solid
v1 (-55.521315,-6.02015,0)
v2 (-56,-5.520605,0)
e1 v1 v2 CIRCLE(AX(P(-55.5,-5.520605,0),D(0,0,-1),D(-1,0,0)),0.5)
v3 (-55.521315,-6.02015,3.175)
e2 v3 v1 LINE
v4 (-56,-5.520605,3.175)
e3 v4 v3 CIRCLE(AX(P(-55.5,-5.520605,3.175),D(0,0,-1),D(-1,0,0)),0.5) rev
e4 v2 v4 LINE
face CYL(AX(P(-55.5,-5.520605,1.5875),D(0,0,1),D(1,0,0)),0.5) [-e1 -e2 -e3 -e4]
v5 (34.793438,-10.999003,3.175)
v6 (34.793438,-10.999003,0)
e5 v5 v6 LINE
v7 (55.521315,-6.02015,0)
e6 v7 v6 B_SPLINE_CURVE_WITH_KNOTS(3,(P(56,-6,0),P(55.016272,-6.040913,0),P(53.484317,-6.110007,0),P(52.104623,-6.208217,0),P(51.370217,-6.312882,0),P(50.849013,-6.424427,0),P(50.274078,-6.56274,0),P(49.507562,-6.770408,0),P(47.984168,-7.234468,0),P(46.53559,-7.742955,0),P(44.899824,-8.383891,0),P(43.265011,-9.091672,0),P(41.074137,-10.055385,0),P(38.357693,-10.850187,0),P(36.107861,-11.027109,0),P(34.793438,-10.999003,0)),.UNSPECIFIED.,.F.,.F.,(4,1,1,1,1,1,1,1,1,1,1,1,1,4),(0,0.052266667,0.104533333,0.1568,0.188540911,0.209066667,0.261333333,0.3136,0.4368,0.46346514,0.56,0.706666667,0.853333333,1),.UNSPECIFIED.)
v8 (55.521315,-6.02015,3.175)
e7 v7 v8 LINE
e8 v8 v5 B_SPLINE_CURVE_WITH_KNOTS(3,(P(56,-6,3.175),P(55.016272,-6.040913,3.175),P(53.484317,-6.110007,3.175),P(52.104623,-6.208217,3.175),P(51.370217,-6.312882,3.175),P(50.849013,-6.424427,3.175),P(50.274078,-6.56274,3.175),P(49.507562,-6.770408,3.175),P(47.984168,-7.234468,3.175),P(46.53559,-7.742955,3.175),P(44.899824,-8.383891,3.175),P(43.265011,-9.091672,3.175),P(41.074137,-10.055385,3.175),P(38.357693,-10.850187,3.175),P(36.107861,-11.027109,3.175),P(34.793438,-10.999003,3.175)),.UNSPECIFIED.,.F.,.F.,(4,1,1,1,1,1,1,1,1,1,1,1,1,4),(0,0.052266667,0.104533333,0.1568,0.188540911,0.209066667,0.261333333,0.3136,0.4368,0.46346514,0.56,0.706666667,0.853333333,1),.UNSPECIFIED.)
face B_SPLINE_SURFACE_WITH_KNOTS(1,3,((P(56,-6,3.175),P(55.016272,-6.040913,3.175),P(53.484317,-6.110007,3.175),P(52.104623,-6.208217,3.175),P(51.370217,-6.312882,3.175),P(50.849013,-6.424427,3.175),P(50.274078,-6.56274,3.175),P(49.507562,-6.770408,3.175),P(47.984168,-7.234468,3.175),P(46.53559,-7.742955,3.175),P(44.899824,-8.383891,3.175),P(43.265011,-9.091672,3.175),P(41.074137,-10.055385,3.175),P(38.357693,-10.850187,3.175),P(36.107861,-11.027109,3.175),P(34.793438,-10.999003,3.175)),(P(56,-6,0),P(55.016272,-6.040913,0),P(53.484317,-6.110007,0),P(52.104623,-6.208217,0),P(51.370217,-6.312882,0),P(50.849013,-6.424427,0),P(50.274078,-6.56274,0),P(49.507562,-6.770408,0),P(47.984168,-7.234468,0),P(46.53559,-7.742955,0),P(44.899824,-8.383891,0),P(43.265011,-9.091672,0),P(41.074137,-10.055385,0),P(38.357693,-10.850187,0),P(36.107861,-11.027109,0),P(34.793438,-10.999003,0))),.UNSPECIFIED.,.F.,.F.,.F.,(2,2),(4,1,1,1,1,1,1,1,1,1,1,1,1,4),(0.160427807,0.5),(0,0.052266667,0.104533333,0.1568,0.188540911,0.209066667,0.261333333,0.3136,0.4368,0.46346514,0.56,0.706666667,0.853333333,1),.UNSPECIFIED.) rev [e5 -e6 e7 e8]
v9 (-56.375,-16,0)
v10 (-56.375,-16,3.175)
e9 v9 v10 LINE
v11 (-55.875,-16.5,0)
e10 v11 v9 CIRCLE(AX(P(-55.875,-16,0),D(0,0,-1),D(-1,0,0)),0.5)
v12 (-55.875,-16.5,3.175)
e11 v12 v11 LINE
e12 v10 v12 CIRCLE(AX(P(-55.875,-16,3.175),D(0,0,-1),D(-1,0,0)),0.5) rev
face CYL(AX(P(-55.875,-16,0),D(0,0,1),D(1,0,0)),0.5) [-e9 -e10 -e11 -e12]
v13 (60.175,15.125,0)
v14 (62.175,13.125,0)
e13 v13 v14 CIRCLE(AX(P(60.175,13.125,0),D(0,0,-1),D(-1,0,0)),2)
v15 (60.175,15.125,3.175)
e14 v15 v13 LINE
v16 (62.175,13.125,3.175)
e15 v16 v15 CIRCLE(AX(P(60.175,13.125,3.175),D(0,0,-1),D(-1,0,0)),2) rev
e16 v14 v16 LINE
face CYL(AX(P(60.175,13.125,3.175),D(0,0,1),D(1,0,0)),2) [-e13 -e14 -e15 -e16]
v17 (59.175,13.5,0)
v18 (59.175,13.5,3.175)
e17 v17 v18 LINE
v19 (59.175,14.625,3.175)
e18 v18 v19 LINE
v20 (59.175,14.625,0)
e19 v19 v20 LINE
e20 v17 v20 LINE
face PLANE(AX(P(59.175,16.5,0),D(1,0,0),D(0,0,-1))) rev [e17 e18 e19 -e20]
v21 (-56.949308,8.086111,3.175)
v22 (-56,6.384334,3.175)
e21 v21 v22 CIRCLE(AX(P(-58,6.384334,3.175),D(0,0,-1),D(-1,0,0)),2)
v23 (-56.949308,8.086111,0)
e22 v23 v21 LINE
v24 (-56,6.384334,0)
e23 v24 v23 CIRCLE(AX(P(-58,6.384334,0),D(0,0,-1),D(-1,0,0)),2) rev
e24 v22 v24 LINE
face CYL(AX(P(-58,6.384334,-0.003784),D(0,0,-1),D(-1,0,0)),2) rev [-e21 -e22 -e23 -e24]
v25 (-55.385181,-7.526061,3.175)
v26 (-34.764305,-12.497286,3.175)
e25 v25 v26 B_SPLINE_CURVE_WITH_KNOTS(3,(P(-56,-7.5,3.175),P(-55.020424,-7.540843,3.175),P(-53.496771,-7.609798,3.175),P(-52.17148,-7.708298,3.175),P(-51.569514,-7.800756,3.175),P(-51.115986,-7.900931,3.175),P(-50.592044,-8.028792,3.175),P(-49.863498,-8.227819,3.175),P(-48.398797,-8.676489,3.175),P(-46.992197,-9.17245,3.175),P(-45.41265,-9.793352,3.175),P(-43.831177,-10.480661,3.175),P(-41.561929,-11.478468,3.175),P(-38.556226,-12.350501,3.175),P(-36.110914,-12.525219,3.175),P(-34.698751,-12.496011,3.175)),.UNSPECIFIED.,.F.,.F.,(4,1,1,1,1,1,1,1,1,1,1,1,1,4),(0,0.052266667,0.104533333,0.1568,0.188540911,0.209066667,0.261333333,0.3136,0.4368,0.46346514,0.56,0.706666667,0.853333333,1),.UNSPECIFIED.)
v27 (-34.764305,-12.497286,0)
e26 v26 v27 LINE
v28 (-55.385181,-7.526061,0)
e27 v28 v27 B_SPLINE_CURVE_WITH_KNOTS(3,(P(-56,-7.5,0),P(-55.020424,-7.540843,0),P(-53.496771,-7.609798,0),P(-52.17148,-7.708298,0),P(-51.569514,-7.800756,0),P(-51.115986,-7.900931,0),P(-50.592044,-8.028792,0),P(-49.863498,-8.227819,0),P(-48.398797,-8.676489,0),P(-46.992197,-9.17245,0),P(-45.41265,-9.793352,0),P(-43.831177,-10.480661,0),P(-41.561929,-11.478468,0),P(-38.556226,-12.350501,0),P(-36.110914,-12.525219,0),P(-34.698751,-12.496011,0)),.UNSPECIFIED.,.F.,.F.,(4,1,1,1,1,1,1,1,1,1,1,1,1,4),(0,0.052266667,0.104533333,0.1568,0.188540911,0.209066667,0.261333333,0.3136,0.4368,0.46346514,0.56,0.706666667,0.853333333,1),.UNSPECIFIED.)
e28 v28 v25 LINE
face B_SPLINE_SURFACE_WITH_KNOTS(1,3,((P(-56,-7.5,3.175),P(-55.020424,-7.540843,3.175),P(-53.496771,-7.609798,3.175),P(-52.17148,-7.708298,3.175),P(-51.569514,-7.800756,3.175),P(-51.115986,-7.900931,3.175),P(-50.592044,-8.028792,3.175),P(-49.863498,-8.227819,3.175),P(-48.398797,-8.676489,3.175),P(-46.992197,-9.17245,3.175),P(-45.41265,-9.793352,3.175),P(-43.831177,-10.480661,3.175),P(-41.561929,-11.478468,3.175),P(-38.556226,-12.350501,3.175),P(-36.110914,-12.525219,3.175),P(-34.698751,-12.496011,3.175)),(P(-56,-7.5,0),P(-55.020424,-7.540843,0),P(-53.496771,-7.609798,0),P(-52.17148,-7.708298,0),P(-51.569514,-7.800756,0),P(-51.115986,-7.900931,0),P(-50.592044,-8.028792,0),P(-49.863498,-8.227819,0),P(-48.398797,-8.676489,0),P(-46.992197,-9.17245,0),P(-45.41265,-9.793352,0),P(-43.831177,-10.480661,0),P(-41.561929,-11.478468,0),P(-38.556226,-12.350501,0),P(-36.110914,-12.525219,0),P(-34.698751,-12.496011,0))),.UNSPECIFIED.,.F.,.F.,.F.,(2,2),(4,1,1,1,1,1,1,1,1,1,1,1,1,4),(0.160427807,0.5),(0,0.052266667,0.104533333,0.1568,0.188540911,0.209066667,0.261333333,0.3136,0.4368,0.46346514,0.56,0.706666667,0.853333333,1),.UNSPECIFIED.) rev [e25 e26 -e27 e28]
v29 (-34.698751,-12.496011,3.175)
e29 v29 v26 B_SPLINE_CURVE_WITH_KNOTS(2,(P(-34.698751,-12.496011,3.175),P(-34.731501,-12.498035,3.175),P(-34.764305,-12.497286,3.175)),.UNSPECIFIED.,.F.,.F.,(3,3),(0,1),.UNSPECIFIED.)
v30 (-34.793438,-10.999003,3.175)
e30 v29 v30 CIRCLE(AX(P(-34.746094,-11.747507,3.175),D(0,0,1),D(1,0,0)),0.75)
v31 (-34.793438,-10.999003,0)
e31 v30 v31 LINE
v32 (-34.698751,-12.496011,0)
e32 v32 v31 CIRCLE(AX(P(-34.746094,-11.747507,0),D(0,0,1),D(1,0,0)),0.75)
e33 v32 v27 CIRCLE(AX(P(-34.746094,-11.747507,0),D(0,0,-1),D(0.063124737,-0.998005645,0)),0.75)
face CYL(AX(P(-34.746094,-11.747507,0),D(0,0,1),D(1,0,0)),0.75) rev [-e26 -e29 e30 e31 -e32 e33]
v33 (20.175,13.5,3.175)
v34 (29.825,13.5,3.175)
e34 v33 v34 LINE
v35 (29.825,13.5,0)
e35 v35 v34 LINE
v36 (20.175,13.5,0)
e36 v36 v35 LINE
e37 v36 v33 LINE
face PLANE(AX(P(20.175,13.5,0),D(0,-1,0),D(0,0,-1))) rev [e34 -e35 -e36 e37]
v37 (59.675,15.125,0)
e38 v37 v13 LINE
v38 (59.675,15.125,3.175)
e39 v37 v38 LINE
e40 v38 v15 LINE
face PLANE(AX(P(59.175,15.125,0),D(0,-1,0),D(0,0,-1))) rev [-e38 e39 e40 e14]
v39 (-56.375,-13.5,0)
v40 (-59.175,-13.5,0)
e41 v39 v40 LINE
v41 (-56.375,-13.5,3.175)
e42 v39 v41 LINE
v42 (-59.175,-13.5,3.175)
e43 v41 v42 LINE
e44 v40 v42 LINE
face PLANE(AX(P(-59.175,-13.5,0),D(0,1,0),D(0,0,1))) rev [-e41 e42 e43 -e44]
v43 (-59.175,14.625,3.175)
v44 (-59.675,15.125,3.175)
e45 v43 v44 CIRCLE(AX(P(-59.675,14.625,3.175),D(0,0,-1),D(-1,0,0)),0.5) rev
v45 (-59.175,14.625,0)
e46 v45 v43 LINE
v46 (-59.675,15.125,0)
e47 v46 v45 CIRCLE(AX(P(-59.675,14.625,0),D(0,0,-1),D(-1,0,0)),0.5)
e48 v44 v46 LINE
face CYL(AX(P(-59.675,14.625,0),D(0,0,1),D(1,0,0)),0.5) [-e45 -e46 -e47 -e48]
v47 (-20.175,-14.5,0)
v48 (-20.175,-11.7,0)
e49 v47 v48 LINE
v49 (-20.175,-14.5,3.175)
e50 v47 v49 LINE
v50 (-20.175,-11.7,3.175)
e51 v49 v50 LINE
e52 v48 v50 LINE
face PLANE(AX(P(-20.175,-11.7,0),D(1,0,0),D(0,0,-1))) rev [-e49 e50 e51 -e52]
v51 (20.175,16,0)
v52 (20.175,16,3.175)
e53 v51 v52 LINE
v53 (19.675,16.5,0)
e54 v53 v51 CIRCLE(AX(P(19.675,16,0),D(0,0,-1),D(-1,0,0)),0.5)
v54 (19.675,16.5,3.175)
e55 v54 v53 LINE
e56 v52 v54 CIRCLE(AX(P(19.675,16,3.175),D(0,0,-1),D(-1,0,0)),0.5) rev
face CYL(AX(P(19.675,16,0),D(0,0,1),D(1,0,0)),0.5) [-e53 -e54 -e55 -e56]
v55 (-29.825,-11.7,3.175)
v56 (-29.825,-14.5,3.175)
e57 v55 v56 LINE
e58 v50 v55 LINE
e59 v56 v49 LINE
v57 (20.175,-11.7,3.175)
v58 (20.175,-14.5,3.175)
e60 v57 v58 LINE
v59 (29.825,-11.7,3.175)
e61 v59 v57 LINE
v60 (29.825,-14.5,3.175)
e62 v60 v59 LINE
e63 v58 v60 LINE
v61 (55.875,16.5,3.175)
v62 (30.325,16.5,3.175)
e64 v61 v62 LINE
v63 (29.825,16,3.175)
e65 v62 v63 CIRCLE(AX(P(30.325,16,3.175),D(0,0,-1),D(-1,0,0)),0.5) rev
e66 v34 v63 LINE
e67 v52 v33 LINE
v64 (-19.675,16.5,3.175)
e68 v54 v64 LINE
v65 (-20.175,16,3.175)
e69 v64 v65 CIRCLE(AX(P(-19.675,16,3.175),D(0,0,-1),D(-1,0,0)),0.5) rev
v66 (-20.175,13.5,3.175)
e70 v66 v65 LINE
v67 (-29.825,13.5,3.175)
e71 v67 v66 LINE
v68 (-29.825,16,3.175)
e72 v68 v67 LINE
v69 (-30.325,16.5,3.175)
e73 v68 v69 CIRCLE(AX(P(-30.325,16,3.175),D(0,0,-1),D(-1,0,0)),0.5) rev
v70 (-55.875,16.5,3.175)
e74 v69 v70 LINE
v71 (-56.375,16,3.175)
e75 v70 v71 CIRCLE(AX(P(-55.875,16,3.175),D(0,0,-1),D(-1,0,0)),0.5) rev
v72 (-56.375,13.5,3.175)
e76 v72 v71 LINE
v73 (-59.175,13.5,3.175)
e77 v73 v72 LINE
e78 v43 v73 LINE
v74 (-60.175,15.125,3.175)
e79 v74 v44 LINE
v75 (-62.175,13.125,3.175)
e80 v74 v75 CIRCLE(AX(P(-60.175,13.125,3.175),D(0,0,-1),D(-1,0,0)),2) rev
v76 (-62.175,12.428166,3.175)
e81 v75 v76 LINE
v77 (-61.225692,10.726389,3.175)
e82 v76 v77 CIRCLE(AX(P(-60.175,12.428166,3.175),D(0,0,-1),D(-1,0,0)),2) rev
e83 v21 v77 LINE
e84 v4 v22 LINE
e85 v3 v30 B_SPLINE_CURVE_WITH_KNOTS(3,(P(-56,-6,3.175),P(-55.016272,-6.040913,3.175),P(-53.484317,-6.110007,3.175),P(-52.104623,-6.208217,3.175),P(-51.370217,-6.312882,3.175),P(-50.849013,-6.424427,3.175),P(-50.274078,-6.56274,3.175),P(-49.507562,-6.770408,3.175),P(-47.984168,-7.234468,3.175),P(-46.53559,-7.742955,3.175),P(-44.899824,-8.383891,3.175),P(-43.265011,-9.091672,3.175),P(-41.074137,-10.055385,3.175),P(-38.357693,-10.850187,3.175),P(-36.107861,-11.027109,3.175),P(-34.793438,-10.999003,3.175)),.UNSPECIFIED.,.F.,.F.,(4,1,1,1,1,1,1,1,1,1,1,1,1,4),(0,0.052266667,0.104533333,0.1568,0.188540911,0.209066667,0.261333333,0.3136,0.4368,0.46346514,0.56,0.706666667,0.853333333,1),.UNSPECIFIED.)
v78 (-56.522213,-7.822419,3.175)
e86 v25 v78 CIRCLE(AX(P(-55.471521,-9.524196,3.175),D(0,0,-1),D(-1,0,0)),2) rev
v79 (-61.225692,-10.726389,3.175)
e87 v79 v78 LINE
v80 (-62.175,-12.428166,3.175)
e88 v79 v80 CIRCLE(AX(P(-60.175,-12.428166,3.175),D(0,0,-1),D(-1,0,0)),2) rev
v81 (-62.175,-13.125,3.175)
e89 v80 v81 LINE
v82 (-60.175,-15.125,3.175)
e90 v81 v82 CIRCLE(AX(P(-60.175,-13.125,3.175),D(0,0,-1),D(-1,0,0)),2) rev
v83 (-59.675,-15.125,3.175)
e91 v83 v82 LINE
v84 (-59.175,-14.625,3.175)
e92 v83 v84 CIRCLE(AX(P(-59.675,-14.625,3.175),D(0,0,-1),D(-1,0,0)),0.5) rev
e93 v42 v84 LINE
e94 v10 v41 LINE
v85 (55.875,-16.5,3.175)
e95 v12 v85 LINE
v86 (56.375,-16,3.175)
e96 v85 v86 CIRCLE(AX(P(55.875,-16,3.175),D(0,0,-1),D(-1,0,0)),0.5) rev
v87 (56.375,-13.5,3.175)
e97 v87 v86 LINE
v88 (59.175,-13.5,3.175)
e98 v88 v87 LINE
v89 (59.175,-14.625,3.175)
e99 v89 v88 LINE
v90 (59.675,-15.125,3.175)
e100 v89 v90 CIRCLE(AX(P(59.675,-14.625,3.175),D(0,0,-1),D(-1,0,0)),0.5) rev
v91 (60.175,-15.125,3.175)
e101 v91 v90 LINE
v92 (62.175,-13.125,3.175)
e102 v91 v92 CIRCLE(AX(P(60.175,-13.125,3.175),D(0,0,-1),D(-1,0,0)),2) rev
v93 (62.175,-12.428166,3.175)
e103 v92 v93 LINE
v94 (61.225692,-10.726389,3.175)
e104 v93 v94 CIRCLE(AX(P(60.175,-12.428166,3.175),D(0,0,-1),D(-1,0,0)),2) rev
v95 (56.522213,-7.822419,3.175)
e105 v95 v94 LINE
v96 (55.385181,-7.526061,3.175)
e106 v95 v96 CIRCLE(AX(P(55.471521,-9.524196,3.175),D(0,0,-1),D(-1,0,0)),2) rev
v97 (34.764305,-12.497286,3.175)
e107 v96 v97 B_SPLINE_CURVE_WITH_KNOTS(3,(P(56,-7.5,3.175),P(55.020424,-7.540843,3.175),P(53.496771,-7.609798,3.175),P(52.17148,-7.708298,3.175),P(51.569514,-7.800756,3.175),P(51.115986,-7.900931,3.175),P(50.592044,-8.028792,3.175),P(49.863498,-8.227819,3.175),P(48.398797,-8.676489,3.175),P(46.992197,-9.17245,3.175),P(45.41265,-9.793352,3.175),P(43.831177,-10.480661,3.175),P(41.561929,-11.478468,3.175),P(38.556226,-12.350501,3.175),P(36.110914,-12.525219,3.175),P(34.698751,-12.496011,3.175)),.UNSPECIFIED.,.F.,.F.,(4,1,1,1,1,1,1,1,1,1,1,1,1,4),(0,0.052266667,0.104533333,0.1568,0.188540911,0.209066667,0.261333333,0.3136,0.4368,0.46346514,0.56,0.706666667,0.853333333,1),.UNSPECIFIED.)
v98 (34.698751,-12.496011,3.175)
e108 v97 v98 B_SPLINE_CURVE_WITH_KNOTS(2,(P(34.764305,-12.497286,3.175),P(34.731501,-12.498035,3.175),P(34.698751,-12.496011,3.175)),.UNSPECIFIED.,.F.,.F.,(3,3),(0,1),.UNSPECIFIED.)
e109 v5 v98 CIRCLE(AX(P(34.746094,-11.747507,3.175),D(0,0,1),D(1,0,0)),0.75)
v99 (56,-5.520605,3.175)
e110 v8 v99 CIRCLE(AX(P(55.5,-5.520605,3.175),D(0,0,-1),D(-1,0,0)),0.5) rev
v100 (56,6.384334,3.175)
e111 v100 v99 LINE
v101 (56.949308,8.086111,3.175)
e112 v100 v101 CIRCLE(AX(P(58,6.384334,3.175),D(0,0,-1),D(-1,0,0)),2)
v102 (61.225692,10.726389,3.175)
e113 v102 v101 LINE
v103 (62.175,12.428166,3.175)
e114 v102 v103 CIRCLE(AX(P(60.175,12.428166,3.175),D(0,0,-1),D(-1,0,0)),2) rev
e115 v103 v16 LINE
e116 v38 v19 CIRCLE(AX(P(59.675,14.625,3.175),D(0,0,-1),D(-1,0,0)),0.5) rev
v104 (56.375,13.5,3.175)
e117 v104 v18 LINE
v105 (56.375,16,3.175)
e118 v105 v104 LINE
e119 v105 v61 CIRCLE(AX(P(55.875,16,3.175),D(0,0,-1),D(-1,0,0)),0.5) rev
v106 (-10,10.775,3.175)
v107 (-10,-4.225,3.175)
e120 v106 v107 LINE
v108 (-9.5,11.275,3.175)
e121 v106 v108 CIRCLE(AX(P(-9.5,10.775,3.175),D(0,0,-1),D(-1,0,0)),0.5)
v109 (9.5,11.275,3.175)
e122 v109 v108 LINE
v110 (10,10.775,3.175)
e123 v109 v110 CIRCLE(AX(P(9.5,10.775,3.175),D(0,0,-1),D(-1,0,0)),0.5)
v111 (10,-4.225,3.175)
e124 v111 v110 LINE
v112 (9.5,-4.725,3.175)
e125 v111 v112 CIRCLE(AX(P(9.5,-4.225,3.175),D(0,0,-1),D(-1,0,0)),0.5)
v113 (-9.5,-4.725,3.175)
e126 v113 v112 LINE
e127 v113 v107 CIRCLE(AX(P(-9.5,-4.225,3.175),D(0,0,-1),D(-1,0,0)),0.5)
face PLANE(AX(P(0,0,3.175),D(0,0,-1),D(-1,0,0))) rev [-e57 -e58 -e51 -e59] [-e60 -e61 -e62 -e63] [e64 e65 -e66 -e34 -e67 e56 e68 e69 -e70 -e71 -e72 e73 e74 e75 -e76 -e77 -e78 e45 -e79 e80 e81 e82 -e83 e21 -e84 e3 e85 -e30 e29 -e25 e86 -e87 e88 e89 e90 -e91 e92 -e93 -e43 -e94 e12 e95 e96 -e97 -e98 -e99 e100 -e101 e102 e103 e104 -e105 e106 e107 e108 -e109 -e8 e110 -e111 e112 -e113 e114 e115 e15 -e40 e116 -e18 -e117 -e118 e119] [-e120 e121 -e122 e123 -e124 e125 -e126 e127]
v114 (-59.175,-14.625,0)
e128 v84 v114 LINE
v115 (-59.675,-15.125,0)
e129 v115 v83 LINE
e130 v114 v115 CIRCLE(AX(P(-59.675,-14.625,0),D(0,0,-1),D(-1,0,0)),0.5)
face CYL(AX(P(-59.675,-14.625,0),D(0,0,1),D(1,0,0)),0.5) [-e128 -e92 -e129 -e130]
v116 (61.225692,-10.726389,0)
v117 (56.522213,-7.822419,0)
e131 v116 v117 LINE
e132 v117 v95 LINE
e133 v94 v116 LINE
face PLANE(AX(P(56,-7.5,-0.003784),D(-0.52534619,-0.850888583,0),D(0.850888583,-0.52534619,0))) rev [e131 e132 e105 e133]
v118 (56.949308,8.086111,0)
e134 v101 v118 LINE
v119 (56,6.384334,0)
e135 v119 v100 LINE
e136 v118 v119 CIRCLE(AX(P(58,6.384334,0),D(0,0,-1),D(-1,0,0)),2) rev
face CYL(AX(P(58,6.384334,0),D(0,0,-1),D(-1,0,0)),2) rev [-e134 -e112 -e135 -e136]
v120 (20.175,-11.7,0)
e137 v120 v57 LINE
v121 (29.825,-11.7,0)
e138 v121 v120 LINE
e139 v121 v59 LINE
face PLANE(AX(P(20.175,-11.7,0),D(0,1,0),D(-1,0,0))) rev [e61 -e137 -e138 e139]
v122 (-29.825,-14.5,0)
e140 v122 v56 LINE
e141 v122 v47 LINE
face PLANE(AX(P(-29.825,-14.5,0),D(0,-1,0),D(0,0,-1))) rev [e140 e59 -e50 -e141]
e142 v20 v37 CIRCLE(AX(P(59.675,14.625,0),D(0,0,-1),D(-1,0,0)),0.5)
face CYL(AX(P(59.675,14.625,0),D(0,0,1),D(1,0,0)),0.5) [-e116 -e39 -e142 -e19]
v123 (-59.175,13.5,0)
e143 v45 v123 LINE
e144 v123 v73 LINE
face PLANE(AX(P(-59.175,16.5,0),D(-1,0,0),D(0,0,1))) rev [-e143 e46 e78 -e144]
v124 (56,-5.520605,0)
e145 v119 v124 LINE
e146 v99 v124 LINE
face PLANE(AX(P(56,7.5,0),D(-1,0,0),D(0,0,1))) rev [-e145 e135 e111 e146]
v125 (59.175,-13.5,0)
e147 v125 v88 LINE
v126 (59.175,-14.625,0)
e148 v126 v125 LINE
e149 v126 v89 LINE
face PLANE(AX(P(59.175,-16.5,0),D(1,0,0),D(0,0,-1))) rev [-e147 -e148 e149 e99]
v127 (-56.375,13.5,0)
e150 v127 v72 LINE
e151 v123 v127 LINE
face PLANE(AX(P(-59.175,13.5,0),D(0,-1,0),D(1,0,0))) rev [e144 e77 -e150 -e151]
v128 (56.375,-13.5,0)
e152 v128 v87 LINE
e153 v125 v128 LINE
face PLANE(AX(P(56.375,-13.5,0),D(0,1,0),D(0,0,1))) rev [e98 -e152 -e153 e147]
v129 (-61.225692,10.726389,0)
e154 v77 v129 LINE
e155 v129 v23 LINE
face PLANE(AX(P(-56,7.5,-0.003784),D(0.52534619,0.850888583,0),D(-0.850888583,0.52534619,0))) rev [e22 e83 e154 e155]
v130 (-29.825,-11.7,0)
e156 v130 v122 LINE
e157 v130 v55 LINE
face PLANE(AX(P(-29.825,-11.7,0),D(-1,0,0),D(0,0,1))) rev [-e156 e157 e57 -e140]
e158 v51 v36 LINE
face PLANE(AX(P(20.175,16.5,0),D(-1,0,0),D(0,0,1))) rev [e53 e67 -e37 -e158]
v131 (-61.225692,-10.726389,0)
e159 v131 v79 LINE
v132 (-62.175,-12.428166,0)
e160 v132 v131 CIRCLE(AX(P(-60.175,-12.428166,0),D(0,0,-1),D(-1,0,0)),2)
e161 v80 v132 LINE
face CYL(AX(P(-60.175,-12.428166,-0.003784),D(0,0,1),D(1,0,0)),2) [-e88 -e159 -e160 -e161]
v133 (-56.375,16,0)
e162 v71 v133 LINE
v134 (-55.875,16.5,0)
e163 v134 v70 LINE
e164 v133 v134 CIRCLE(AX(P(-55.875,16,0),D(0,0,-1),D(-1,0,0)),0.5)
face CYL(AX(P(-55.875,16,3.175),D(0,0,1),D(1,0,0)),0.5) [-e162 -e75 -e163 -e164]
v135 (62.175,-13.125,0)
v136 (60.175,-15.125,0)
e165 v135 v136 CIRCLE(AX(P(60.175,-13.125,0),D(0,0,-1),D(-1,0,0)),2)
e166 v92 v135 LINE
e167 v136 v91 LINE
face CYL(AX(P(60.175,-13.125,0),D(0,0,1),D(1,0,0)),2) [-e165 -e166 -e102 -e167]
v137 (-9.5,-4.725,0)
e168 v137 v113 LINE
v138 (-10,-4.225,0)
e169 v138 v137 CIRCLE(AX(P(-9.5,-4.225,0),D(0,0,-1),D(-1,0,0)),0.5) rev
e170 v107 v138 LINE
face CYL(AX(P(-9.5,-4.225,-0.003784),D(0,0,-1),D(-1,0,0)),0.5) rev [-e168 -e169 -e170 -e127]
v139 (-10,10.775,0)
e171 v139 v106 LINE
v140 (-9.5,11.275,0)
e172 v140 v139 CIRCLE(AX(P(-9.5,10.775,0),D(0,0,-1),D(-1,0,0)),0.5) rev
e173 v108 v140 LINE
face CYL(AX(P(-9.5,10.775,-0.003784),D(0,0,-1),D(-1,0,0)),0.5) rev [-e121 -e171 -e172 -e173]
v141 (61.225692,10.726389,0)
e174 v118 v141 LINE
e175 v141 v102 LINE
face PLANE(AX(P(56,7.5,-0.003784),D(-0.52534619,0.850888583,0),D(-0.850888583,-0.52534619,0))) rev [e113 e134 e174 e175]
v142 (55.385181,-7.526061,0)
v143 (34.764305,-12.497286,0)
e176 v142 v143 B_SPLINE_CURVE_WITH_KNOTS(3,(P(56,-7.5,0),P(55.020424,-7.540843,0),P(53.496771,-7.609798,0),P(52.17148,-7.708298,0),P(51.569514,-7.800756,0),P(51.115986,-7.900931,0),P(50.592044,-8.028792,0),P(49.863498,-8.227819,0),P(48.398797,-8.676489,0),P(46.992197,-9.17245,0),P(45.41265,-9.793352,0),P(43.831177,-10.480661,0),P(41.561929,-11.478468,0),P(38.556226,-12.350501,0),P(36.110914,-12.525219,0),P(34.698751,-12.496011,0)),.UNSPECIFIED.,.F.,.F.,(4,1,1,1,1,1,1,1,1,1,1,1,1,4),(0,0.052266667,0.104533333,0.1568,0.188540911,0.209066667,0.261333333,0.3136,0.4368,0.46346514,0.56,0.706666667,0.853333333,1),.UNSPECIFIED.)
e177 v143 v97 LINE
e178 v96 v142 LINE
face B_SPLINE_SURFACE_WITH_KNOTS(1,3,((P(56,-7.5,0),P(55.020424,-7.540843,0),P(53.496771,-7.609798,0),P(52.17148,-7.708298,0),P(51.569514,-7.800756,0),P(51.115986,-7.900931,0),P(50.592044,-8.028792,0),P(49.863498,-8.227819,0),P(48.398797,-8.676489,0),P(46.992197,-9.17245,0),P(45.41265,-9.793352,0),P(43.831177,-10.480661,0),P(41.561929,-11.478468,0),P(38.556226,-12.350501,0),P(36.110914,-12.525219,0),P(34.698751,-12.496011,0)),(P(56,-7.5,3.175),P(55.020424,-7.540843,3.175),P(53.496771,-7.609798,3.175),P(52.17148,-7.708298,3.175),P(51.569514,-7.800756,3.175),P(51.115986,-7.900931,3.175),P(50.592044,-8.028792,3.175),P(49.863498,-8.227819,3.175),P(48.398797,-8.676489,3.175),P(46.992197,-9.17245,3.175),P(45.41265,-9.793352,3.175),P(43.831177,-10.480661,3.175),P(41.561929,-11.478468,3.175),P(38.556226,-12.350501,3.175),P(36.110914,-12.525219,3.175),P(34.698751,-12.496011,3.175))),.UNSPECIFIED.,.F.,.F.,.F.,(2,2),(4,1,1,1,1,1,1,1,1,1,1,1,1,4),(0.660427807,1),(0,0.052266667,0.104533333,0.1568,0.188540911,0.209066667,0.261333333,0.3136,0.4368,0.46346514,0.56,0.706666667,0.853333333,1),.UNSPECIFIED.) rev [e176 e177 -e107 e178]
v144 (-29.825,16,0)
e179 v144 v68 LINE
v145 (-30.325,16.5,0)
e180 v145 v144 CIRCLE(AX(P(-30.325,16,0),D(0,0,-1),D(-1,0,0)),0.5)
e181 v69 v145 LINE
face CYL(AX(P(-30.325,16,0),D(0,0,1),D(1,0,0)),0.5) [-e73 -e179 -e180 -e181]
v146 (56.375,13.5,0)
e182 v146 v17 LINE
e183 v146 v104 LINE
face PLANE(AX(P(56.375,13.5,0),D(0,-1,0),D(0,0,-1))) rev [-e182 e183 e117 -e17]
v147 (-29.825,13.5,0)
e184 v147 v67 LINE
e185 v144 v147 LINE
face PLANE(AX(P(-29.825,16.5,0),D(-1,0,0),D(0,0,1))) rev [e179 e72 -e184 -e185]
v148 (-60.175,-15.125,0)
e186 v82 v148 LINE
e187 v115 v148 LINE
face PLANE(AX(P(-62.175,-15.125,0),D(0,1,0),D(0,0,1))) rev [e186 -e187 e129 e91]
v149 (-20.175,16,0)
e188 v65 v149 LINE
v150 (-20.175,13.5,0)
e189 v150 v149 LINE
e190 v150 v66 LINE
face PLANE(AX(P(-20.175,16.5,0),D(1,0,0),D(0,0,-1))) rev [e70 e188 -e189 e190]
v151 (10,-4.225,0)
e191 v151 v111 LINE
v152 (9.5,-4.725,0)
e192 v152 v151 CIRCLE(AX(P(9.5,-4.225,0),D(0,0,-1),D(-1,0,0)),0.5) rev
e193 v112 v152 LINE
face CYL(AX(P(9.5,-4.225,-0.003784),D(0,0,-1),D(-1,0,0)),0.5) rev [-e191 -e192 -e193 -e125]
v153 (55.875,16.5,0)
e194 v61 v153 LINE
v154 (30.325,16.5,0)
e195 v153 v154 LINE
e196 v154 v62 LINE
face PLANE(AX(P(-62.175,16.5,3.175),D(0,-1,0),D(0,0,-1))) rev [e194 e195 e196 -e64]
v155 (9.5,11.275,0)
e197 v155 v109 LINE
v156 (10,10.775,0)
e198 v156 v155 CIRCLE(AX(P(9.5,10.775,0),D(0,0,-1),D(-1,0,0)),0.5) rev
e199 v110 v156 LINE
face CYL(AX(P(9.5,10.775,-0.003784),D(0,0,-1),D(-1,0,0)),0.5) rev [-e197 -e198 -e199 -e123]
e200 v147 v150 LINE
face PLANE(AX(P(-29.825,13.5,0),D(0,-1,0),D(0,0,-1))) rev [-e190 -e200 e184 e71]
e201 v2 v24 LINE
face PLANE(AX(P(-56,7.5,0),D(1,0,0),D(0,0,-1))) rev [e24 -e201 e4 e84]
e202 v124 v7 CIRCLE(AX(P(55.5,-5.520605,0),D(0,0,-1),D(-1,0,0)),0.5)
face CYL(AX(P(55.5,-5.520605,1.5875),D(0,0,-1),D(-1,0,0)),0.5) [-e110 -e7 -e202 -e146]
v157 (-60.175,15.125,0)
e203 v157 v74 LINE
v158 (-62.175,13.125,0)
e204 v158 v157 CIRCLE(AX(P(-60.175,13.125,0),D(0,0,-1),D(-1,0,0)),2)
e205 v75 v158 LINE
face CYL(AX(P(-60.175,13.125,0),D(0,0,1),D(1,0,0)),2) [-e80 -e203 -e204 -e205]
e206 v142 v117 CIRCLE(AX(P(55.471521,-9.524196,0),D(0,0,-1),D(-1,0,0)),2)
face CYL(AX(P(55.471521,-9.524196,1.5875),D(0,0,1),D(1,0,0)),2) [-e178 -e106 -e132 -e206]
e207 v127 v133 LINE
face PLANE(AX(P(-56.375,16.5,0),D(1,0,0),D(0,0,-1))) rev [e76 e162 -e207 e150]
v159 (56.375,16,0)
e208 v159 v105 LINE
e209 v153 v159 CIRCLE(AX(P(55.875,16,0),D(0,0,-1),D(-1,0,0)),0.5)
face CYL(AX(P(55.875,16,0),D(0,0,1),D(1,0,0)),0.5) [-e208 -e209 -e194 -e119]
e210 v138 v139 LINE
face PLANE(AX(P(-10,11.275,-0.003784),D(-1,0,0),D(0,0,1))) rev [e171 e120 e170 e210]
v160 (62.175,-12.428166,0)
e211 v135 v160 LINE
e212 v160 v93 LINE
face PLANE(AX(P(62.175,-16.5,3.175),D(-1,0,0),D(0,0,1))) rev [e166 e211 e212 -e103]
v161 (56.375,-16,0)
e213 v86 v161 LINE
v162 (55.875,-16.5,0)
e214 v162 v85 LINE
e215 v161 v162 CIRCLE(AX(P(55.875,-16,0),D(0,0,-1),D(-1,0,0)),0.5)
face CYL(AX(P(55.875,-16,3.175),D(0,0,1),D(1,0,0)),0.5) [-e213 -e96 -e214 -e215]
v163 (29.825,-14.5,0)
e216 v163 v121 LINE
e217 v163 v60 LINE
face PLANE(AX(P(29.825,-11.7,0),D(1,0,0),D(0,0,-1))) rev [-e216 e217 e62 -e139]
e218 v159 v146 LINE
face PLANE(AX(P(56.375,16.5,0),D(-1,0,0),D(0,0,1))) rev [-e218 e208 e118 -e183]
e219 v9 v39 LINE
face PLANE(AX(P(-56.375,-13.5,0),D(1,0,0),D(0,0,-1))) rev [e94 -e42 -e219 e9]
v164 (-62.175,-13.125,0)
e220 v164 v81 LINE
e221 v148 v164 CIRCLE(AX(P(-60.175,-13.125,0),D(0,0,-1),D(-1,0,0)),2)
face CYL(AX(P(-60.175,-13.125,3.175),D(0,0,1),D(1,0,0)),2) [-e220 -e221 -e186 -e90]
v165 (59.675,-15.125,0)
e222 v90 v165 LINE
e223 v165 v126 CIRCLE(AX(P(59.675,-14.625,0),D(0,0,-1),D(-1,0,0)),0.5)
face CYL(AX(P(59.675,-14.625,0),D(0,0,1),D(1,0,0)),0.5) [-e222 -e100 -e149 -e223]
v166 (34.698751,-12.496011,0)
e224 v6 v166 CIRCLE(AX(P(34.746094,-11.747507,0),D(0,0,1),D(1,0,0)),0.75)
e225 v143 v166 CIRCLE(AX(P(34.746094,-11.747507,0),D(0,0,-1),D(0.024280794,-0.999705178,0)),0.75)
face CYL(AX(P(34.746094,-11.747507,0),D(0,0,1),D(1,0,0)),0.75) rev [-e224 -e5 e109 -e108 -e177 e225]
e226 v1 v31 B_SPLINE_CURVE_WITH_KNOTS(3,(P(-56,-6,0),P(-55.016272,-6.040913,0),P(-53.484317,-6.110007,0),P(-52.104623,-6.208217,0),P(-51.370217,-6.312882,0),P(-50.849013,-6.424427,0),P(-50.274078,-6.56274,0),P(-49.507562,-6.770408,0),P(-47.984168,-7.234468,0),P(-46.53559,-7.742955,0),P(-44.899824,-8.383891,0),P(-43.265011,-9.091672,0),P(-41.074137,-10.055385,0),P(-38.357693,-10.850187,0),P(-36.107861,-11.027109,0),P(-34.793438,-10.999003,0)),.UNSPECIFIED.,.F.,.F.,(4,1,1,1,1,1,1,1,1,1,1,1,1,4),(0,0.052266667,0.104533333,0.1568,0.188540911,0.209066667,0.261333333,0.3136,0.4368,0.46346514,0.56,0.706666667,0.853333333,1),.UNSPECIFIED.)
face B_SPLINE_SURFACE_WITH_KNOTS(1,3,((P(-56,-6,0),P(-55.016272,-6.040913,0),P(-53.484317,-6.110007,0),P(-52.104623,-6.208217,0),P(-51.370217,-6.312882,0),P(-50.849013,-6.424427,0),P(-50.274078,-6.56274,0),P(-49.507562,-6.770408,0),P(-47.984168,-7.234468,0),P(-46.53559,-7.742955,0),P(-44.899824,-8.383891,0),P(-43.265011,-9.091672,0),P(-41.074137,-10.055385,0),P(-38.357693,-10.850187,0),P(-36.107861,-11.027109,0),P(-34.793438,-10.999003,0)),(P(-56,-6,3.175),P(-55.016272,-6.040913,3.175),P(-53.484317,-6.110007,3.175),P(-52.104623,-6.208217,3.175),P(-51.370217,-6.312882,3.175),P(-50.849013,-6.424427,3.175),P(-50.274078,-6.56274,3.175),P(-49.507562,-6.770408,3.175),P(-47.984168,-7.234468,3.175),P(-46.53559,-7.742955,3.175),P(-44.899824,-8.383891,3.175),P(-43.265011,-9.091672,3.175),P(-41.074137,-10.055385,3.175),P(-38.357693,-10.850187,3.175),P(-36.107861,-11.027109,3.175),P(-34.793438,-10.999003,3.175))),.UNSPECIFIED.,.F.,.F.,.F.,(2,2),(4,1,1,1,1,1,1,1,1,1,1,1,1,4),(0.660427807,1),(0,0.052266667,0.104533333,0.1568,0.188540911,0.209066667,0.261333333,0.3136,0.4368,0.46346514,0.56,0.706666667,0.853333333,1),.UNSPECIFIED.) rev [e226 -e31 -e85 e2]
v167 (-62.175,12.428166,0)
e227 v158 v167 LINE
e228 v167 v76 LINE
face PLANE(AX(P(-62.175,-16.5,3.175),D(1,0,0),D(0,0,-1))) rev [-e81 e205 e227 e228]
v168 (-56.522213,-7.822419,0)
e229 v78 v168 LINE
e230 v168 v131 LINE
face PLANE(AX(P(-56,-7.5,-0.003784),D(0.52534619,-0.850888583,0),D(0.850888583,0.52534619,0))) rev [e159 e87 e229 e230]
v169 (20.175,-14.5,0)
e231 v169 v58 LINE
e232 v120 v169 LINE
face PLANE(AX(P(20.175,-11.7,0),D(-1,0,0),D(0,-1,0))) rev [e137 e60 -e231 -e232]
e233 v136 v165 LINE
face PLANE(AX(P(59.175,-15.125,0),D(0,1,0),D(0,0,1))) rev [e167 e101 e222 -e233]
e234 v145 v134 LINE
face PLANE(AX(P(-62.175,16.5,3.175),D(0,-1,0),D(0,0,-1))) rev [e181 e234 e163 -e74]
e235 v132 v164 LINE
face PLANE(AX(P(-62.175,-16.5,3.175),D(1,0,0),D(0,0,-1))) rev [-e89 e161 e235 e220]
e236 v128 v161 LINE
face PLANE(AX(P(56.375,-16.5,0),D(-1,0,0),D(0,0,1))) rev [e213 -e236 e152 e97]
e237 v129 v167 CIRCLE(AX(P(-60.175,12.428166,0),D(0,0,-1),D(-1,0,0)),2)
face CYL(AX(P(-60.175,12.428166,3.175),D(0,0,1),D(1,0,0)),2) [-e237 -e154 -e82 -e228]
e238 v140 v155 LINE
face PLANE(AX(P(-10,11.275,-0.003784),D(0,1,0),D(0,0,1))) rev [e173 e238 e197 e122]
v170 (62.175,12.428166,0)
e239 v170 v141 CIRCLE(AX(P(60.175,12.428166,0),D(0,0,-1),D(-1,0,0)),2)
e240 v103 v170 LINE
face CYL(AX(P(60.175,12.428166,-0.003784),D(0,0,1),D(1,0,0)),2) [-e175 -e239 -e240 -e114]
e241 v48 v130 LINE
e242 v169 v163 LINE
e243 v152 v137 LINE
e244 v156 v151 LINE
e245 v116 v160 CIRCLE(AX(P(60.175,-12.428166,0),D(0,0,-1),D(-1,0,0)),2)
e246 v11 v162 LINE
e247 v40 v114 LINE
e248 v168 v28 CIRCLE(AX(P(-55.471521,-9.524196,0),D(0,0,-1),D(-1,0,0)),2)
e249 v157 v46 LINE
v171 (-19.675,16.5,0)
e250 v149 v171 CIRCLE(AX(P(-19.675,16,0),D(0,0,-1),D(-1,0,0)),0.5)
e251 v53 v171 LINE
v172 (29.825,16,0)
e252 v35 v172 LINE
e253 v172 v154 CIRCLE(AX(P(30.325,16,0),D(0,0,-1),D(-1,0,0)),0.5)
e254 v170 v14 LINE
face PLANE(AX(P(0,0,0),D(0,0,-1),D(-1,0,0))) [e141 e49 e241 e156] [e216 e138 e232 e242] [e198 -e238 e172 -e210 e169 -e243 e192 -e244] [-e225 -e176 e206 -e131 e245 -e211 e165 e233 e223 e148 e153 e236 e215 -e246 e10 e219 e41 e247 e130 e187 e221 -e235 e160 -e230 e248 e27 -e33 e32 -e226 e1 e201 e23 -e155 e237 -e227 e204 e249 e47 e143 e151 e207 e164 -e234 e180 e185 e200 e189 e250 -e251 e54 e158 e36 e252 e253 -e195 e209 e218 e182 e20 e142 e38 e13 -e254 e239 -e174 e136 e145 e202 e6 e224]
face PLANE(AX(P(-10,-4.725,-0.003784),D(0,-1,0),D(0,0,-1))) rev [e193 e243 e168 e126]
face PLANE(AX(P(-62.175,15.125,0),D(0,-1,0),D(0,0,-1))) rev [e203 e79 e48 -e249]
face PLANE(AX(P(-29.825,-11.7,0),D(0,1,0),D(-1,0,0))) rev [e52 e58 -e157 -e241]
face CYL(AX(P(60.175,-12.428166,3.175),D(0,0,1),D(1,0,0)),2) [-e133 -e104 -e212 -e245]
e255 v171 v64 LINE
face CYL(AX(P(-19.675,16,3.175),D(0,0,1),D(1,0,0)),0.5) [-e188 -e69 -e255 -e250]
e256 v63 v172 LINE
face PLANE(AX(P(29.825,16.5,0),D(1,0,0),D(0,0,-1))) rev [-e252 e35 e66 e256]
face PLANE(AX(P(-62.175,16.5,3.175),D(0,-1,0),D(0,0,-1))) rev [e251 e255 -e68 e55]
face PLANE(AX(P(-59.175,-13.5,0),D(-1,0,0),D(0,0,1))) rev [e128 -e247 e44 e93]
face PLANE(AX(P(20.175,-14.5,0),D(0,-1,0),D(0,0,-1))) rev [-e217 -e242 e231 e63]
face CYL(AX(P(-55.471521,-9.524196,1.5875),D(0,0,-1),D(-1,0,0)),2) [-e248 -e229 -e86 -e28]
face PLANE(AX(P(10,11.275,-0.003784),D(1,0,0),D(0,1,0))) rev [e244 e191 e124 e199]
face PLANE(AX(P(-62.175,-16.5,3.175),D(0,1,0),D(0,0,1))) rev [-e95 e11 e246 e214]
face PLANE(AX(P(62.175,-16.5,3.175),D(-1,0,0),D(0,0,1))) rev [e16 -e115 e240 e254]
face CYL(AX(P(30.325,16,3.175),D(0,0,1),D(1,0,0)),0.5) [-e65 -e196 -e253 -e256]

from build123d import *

# Parameters (mm, degrees)
SKETCH1_W           = 124.35
SKETCH1_H           = 33
BOSS_EXTRUDE1_DEPTH = 3.175
SKETCH2_W           = 9.65
SKETCH2_H           = 2.8
SKETCH2_H_2         = 3
CUT_EXTRUDE1_DEPTH  = 65.405444257
SKETCH4_W           = 2.8
SKETCH4_H           = 3
SKETCH4_W_2         = 6.175
SKETCH4_H_2         = 15
CUT_EXTRUDE2_DEPTH  = 65.405444257
SKETCH6_W           = 3
SKETCH6_H           = 1.375
CUT_EXTRUDE3_DEPTH  = 65.405444257
CUT_SWEEP1_DEPTH    = 3.175
SKETCH12_R          = 0.75
CUT_EXTRUDE6_DEPTH  = 65.405444385
CUT_EXTRUDE7_DEPTH  = 65.405444385
FILLET6_R           = 2
FILLET7_R           = 0.5
SKETCH14_W          = 20
SKETCH14_H          = 16
CUT_EXTRUDE8_DEPTH  = 65.405444385
FILLET8_R           = 0.5


# Read off the part's stored shape, not the designer's step: Cut-Sweep1
with BuildPart() as part:
    # Sketch1 → Boss-Extrude1 (new body)
    with BuildSketch(Plane.XY):
        Rectangle(SKETCH1_W, SKETCH1_H)
    extrude(amount=BOSS_EXTRUDE1_DEPTH)

    # Sketch2 → Cut-Extrude1 (cut, through all)
    with BuildSketch(Plane.XY.offset(3.175)):
        with Locations((-25, -13.1)):
            Rectangle(SKETCH2_W, SKETCH2_H)
        with Locations((25, -13.1)):
            Rectangle(SKETCH2_W, SKETCH2_H)
        with Locations((-25, 15)):
            Rectangle(SKETCH2_W, SKETCH2_H_2)
        with Locations((25, 15)):
            Rectangle(SKETCH2_W, SKETCH2_H_2)
    extrude(amount=-CUT_EXTRUDE1_DEPTH, mode=Mode.SUBTRACT)

    # Sketch4 → Cut-Extrude2 (cut, through all)
    with BuildSketch(Plane.XY.offset(3.175)):
        with Locations((-57.775, 15)):
            Rectangle(SKETCH4_W, SKETCH4_H)
        with Locations((-59.0875, 0)):
            Rectangle(SKETCH4_W_2, SKETCH4_H_2)
        with Locations((-57.775, -15)):
            Rectangle(SKETCH4_W, SKETCH4_H)
        with Locations((57.775, 15)):
            Rectangle(SKETCH4_W, SKETCH4_H)
        with Locations((59.0875, 0)):
            Rectangle(SKETCH4_W_2, SKETCH4_H_2)
        with Locations((57.775, -15)):
            Rectangle(SKETCH4_W, SKETCH4_H)
    extrude(amount=-CUT_EXTRUDE2_DEPTH, mode=Mode.SUBTRACT)

    # Sketch6 → Cut-Extrude3 (cut, through all)
    with BuildSketch(Plane.XY.offset(3.175)):
        with Locations((-60.675, 15.8125)):
            Rectangle(SKETCH6_W, SKETCH6_H)
        with Locations((-60.675, -15.8125)):
            Rectangle(SKETCH6_W, SKETCH6_H)
        with Locations((60.675, 15.8125)):
            Rectangle(SKETCH6_W, SKETCH6_H)
        with Locations((60.675, -15.8125)):
            Rectangle(SKETCH6_W, SKETCH6_H)
    extrude(amount=-CUT_EXTRUDE3_DEPTH, mode=Mode.SUBTRACT)

    # Cut-Sweep1 outline → Cut-Sweep1 (cut)
    with BuildSketch(Plane.XY):
        with BuildLine():
            add(Edge.make_bspline(
                [(-56, -6), (-55.016272395, -6.040912607), (-53.484317245, -6.110006936), (-52.10462272, -6.208217255), (-51.370216858, -6.312882143), (-50.849013323, -6.424427059), (-50.274077583, -6.562740427), (-49.507561658, -6.770408498), (-47.98416767, -7.234467607), (-46.535590196, -7.742954919), (-44.899823838, -8.383891144), (-43.265010906, -9.091671777), (-41.074137026, -10.055384808), (-38.357692762, -10.850187014), (-36.1078612, -11.027108547), (-34.793437631, -10.999002823)],
                knots=[0, 0, 0, 0, 0.052266667, 0.104533333, 0.1568, 0.188540911, 0.209066667, 0.261333333, 0.3136, 0.4368, 0.46346514, 0.56, 0.706666667, 0.853333333, 1, 1, 1, 1], degree=3))
            Line((-56, -6), (-56, -7.5))
            add(Edge.make_bspline(
                [(-56, -7.5), (-55.020423649, -7.540842864), (-53.496771007, -7.609797709), (-52.171479553, -7.70829789), (-51.569513747, -7.80075633), (-51.115986388, -7.900930823), (-50.592043829, -8.028791809), (-49.863497697, -8.22781936), (-48.398796638, -8.676488924), (-46.992197023, -9.172450468), (-45.412650318, -9.7933523), (-43.831176536, -10.480660701), (-41.561928867, -11.478467634), (-38.556226285, -12.350501385), (-36.110914304, -12.525218982), (-34.698750526, -12.49601129)],
                knots=[0, 0, 0, 0, 0.052266667, 0.104533333, 0.1568, 0.188540911, 0.209066667, 0.261333333, 0.3136, 0.4368, 0.46346514, 0.56, 0.706666667, 0.853333333, 1, 1, 1, 1], degree=3))
            Line((-34.698750526, -12.49601129), (-34.793437631, -10.999002823))
        make_face()
    cut_sweep1 = extrude(amount=CUT_SWEEP1_DEPTH, mode=Mode.SUBTRACT)

    # Mirror1: Cut-Sweep1 across plane
    add(cut_sweep1.mirror(Plane.ZY), mode=Mode.SUBTRACT)

    # Sketch12 → Cut-Extrude6 (cut, through all)
    with BuildSketch(Plane.XY.offset(3.175)):
        with Locations((-34.746094079, -11.747507056)):
            Circle(SKETCH12_R)
        with Locations((34.746094079, -11.747507056)):
            Circle(SKETCH12_R)
    extrude(amount=-CUT_EXTRUDE6_DEPTH, mode=Mode.SUBTRACT)

    # Sketch13 → Cut-Extrude7 (cut, through all)
    with BuildSketch(Plane.XY.offset(3.175)):
        Polygon((-56, 7.5), (-62.175, 11.3125), (-62.175, 7.5), align=None)
        Polygon((-56, -7.5), (-62.175, -11.3125), (-62.175, -7.5), align=None)
        Polygon((56, 7.5), (62.175, 11.3125), (62.175, 7.5), align=None)
        Polygon((56, -7.5), (62.175, -11.3125), (62.175, -7.5), align=None)
    extrude(amount=-CUT_EXTRUDE7_DEPTH, mode=Mode.SUBTRACT)

    # Fillet6
    fillet6_edges = [part.edges().sort_by_distance(p)[0] for p in [
        (62.175, -15.125, 1.5875),
        (62.175, -11.3125, 1.5875),
        (56, -7.5, 1.5875),
        (56, 7.5, 1.5875),
        (62.175, 11.3125, 1.5875),
        (62.175, 15.125, 1.5875),
        (-62.175, -15.125, 1.5875),
        (-62.175, -11.3125, 1.5875),
        (-56, -7.5, 1.5875),
        (-62.175, 15.125, 1.5875),
        (-62.175, 11.3125, 1.5875),
        (-56, 7.5, 1.5875),
    ]]
    fillet(fillet6_edges, radius=FILLET6_R)

    # Fillet7
    fillet7_edges = [part.edges().sort_by_distance(p)[0] for p in [
        (59.175, 15.125, 1.5875),
        (59.175, -15.125, 1.5875),
        (-59.175, -15.125, 1.5875),
        (-59.175, 15.125, 1.5875),
        (20.175, 16.5, 1.5875),
        (29.825, 16.5, 1.5875),
        (-20.175, 16.5, 1.5875),
        (-29.825, 16.5, 1.5875),
        (56.375, -16.5, 1.5875),
        (56, -6, 1.5875),
        (56.375, 16.5, 1.5875),
        (-56.375, 16.5, 1.5875),
        (-56.375, -16.5, 1.5875),
        (-56, -6, 1.5875),
    ]]
    fillet(fillet7_edges, radius=FILLET7_R)

    # Sketch14 → Cut-Extrude8 (cut, through all)
    with BuildSketch(Plane.XY.offset(3.175)):
        with Locations((0, 3.275)):
            Rectangle(SKETCH14_W, SKETCH14_H)
    extrude(amount=-CUT_EXTRUDE8_DEPTH, mode=Mode.SUBTRACT)

    # Fillet8
    fillet8_edges = [part.edges().sort_by_distance(p)[0] for p in [
        (-10, -4.725, 1.5875),
        (-10, 11.275, 1.5875),
        (10, 11.275, 1.5875),
        (10, -4.725, 1.5875),
    ]]
    fillet(fillet8_edges, radius=FILLET8_R)


solid = part.part
